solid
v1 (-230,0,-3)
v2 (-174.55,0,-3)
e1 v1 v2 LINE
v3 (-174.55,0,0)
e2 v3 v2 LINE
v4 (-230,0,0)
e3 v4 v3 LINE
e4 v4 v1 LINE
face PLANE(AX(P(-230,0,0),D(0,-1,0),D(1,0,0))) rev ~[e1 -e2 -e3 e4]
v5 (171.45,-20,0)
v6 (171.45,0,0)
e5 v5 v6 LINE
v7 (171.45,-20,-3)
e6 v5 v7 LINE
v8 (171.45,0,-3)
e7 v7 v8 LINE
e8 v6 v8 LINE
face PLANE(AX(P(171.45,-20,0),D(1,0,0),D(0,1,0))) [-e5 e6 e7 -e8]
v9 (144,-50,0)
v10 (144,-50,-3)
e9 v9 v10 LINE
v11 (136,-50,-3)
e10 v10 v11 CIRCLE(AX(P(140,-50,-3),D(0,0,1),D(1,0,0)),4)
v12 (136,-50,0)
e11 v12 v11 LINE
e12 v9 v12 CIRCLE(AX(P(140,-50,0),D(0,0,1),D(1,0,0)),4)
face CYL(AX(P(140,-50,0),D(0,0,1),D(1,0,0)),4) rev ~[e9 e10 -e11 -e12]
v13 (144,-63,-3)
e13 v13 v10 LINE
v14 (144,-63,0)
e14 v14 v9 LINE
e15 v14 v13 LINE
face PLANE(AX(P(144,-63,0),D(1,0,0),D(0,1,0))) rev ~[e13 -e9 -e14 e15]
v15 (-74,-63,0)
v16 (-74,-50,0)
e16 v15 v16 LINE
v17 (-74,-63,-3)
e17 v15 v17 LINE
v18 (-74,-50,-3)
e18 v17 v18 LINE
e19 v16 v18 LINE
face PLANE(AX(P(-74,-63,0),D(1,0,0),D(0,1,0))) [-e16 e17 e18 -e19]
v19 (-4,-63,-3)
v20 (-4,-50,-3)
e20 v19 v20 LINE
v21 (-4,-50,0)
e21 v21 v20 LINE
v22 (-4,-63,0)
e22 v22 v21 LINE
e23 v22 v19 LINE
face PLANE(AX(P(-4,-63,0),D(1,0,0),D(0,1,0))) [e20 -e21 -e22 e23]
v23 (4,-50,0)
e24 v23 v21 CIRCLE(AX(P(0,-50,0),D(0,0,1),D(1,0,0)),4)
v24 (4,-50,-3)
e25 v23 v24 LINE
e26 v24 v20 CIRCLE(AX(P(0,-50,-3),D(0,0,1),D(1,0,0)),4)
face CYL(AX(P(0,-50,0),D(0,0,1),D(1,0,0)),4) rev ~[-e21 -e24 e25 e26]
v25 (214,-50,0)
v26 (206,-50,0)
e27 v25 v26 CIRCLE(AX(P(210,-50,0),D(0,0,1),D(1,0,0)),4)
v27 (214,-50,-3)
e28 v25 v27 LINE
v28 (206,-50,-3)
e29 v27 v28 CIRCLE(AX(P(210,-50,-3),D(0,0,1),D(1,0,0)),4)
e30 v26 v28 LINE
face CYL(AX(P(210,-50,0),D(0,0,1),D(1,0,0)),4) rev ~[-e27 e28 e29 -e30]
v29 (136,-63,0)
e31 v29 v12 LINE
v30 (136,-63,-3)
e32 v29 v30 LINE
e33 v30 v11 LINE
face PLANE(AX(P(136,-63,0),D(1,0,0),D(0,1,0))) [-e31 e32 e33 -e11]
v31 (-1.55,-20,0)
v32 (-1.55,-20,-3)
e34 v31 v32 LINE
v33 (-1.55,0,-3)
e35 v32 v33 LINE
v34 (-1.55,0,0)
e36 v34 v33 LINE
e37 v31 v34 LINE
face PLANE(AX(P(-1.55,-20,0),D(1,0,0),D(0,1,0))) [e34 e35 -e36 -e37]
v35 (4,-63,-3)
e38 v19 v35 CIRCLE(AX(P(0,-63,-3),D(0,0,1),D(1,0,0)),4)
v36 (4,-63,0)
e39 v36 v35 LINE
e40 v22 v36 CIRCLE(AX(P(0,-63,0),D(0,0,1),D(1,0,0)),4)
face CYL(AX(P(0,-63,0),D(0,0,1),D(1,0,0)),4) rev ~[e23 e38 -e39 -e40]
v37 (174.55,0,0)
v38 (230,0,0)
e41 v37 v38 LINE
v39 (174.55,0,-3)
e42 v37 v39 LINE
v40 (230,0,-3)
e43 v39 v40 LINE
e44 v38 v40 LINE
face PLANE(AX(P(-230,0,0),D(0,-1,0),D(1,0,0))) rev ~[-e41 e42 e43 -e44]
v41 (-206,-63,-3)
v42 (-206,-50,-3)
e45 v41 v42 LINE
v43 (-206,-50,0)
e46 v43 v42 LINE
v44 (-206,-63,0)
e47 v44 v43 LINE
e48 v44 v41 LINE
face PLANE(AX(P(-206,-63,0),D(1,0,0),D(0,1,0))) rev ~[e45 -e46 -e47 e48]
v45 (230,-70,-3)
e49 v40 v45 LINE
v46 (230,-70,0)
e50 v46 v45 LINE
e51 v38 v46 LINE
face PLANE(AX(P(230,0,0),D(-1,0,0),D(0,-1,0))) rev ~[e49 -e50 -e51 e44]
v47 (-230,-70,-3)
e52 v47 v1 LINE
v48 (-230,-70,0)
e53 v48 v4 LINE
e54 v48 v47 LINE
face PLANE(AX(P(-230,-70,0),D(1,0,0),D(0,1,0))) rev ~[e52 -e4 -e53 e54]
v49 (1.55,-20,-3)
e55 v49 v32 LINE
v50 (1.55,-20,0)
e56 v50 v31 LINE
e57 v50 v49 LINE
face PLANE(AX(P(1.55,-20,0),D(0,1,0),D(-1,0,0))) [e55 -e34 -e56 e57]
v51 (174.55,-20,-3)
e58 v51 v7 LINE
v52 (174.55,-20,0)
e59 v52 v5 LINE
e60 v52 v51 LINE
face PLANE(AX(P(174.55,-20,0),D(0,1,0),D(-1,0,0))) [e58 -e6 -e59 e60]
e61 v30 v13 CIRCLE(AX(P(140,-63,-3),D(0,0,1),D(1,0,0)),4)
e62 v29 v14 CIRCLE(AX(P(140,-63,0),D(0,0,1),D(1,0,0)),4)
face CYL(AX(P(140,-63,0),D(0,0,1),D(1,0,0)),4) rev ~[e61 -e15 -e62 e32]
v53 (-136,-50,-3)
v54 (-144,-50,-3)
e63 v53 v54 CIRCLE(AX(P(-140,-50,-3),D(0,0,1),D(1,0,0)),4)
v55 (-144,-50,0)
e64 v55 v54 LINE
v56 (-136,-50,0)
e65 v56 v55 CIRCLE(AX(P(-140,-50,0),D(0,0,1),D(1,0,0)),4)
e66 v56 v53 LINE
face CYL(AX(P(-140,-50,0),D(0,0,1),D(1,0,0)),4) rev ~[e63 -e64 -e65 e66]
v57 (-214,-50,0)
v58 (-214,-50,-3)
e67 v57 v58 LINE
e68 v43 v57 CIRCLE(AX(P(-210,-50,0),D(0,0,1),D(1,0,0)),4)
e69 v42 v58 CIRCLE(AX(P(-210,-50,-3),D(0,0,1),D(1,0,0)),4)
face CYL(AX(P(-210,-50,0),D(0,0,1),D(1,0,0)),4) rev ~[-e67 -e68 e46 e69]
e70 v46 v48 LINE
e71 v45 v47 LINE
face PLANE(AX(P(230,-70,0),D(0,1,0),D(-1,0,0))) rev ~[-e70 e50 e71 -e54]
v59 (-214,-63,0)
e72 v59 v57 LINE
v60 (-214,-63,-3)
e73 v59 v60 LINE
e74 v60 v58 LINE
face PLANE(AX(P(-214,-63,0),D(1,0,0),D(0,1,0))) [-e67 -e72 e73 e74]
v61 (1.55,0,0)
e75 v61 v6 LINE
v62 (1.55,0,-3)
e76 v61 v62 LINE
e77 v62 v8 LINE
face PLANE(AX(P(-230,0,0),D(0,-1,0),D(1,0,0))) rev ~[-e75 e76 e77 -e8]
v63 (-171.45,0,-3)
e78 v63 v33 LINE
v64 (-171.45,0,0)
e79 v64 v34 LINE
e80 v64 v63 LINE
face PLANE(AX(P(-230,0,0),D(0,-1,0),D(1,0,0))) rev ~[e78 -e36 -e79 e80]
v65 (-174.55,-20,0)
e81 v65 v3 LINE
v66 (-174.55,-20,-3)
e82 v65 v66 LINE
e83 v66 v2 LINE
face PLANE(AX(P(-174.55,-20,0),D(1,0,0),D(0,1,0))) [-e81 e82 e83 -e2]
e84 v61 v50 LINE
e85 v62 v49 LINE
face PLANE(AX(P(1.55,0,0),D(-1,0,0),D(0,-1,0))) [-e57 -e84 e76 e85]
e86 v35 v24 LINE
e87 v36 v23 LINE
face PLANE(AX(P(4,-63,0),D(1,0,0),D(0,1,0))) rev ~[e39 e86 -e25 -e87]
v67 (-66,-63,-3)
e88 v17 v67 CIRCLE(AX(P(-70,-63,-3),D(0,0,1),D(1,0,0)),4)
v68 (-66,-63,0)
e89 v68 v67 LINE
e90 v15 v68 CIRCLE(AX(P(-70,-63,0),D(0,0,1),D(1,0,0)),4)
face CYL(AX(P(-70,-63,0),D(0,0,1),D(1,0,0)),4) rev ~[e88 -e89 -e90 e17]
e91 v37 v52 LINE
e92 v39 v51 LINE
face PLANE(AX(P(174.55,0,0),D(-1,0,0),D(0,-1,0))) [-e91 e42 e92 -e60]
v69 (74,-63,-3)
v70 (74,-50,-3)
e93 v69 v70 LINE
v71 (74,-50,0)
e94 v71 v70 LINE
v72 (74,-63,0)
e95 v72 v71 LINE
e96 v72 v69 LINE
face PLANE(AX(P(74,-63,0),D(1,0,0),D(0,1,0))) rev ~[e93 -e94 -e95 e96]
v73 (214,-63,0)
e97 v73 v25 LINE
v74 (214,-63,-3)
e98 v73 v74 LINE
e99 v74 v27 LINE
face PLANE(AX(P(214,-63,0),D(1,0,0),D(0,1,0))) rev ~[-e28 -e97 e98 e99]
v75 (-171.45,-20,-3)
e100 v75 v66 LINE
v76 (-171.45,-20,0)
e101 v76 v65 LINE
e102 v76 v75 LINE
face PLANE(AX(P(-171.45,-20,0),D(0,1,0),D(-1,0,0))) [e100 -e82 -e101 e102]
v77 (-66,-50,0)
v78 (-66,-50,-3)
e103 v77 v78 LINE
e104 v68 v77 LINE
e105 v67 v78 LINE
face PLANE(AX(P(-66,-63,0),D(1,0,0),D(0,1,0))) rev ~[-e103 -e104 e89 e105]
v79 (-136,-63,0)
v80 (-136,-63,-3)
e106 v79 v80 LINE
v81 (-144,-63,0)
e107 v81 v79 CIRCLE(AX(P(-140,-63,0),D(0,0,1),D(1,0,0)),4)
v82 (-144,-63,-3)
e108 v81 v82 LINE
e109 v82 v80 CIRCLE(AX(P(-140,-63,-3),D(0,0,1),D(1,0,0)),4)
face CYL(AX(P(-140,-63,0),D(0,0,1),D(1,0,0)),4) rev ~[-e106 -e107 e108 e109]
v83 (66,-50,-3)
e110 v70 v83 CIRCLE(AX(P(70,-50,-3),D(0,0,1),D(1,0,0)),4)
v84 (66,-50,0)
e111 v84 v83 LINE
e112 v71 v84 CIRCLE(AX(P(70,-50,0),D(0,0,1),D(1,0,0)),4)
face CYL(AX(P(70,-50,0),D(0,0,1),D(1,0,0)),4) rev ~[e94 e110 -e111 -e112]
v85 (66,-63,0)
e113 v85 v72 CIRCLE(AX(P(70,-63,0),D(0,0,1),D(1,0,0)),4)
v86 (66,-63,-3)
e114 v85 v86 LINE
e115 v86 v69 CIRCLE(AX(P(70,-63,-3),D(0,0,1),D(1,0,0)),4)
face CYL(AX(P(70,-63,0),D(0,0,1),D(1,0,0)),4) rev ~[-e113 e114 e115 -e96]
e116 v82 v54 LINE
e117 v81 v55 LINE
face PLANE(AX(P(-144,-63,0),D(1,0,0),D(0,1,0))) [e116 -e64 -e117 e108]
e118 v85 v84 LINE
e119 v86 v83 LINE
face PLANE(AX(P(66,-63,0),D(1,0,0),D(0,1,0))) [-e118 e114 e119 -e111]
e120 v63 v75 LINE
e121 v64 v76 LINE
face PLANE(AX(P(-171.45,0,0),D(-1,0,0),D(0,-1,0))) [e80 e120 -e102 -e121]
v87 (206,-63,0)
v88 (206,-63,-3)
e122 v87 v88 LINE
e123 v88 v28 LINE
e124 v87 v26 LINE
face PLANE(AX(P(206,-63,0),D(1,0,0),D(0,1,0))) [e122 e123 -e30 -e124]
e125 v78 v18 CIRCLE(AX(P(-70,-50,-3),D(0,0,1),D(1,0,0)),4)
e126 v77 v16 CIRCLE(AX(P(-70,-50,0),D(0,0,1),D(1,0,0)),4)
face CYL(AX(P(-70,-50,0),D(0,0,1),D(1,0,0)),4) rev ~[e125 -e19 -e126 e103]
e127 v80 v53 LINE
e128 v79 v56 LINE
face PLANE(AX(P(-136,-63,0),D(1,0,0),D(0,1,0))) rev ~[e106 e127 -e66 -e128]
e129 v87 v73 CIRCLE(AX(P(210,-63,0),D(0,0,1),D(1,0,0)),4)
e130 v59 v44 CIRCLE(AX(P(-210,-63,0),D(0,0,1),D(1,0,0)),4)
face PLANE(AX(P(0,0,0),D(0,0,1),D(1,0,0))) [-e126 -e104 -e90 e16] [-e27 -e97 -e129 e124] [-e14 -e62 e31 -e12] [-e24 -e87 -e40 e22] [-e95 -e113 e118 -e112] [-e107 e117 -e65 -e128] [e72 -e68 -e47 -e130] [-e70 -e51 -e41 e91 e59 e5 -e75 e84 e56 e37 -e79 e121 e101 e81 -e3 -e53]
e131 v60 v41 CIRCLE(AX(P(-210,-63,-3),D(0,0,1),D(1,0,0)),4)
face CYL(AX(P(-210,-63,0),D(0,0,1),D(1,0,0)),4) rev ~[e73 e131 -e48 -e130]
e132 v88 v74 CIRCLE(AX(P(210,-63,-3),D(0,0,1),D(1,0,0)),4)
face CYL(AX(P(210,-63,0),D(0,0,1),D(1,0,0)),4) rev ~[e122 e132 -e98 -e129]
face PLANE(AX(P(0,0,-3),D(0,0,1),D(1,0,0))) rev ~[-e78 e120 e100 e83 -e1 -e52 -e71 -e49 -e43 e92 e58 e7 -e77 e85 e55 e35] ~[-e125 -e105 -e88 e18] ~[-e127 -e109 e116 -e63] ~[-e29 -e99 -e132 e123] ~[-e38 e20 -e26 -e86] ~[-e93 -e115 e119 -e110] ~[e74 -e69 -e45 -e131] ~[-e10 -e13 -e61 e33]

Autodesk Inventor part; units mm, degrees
ref_plane "YZ Plane" through (0, 0, 0) normal (1, 0, 0) x (0, 1, 0)
ref_plane "XZ Plane" through (0, 0, 0) normal (0, 1, 0) x (-1, 0, 0)
ref_plane "XY Plane" through (0, 0, 0) normal (0, 0, 1) x (1, 0, 0)
sketch "Sketch1" plane through (0, 0, 0) normal (0, 0, 1) x (1, 0, 0)
  line L0 (-230, 0) -> (230, 0)
  line L1 (230, 0) -> (230, -70)
  line L2 (230, -70) -> (-230, -70)
  line L3 (-230, -70) -> (-230, 0)
  point P0 (0, 0)
  point P1 (0, 0)
  dimension "d0" = 460
  dimension "d1" = 70
extrude "Plate1" add sketch "Sketch1" against normal blind 3
sketch "Sketch2" plane through (0, 0, 0) normal (0, 0, 1) x (1, 0, 0)
  line L0 (-230, -70) -> (230, -70) projected
  line L1 (230, -70) -> (230, 0) projected
  line L2 (230, 0) -> (-230, 0) projected
  line L3 (-230, 0) -> (-230, -70) projected
  circle A0 centre (0, -63) radius 4
  circle A1 centre (0, -50) radius 4
  line L4 (4, -63) -> (4, -50)
  line L5 (-4, -63) -> (-4, -50)
  point P0 (0, 0)
  point P1 (0, -70)
  dimension "d3" = 8
  dimension "d5" = 7
  dimension "d22" = 13
extrude "Cut1" cut sketch "Sketch2" against normal through all contours A0 | A0 L5 A1 L4 | A1
pattern_linear "Rectangular Pattern1" count 7 spacing 70 along (-1, 0, 0) of "Cut1" first direction both ways yes
sketch "Sketch3" plane through (0, 0, 0) normal (0, 0, 1) x (1, 0, 0)
  line L0 (1.55, -20) -> (-1.55, -20)
  line L1 (-1.55, -20) -> (-1.55, 0)
  line L2 (-1.55, 0) -> (1.55, 0)
  line L3 (1.55, 0) -> (1.55, -20)
  line L4 (230, 0) -> (-230, 0) projected
  point P0 (0, 0)
  point P1 (0, 0)
  point P2 (0, 0)
  dimension "d11" = 3.1
  dimension "d12" = 20
extrude "Cut2" cut sketch "Sketch3" against normal blind 3
pattern_linear "Rectangular Pattern2" count 3 spacing 173 along (-1, 0, 0) of "Cut2" first direction both ways yes
equation "\"d6\" = Thickness"
equation "\"d13\" = Thickness"
equation "\"d2\" = Thickness"
equation "\"BendReliefWidth\" = Thickness"
equation "\"BendReliefDepth\" = 0.5 * Thickness"
equation "\"CornerReliefSize\" = 4 * Thickness"
equation "\"MinimumRemnant\" = 2 * Thickness"
equation "\"TransitionRadius\" = BendRadius"
equation "\"JacobiRadiusSize\" = BendRadius"
equation "\"GapSize\" = Thickness"
equation "\"Thickness\" = 3"
equation "\"BendRadius\" = 5"
properties part number "TRM 032 plate" material "Stainless Steel"
